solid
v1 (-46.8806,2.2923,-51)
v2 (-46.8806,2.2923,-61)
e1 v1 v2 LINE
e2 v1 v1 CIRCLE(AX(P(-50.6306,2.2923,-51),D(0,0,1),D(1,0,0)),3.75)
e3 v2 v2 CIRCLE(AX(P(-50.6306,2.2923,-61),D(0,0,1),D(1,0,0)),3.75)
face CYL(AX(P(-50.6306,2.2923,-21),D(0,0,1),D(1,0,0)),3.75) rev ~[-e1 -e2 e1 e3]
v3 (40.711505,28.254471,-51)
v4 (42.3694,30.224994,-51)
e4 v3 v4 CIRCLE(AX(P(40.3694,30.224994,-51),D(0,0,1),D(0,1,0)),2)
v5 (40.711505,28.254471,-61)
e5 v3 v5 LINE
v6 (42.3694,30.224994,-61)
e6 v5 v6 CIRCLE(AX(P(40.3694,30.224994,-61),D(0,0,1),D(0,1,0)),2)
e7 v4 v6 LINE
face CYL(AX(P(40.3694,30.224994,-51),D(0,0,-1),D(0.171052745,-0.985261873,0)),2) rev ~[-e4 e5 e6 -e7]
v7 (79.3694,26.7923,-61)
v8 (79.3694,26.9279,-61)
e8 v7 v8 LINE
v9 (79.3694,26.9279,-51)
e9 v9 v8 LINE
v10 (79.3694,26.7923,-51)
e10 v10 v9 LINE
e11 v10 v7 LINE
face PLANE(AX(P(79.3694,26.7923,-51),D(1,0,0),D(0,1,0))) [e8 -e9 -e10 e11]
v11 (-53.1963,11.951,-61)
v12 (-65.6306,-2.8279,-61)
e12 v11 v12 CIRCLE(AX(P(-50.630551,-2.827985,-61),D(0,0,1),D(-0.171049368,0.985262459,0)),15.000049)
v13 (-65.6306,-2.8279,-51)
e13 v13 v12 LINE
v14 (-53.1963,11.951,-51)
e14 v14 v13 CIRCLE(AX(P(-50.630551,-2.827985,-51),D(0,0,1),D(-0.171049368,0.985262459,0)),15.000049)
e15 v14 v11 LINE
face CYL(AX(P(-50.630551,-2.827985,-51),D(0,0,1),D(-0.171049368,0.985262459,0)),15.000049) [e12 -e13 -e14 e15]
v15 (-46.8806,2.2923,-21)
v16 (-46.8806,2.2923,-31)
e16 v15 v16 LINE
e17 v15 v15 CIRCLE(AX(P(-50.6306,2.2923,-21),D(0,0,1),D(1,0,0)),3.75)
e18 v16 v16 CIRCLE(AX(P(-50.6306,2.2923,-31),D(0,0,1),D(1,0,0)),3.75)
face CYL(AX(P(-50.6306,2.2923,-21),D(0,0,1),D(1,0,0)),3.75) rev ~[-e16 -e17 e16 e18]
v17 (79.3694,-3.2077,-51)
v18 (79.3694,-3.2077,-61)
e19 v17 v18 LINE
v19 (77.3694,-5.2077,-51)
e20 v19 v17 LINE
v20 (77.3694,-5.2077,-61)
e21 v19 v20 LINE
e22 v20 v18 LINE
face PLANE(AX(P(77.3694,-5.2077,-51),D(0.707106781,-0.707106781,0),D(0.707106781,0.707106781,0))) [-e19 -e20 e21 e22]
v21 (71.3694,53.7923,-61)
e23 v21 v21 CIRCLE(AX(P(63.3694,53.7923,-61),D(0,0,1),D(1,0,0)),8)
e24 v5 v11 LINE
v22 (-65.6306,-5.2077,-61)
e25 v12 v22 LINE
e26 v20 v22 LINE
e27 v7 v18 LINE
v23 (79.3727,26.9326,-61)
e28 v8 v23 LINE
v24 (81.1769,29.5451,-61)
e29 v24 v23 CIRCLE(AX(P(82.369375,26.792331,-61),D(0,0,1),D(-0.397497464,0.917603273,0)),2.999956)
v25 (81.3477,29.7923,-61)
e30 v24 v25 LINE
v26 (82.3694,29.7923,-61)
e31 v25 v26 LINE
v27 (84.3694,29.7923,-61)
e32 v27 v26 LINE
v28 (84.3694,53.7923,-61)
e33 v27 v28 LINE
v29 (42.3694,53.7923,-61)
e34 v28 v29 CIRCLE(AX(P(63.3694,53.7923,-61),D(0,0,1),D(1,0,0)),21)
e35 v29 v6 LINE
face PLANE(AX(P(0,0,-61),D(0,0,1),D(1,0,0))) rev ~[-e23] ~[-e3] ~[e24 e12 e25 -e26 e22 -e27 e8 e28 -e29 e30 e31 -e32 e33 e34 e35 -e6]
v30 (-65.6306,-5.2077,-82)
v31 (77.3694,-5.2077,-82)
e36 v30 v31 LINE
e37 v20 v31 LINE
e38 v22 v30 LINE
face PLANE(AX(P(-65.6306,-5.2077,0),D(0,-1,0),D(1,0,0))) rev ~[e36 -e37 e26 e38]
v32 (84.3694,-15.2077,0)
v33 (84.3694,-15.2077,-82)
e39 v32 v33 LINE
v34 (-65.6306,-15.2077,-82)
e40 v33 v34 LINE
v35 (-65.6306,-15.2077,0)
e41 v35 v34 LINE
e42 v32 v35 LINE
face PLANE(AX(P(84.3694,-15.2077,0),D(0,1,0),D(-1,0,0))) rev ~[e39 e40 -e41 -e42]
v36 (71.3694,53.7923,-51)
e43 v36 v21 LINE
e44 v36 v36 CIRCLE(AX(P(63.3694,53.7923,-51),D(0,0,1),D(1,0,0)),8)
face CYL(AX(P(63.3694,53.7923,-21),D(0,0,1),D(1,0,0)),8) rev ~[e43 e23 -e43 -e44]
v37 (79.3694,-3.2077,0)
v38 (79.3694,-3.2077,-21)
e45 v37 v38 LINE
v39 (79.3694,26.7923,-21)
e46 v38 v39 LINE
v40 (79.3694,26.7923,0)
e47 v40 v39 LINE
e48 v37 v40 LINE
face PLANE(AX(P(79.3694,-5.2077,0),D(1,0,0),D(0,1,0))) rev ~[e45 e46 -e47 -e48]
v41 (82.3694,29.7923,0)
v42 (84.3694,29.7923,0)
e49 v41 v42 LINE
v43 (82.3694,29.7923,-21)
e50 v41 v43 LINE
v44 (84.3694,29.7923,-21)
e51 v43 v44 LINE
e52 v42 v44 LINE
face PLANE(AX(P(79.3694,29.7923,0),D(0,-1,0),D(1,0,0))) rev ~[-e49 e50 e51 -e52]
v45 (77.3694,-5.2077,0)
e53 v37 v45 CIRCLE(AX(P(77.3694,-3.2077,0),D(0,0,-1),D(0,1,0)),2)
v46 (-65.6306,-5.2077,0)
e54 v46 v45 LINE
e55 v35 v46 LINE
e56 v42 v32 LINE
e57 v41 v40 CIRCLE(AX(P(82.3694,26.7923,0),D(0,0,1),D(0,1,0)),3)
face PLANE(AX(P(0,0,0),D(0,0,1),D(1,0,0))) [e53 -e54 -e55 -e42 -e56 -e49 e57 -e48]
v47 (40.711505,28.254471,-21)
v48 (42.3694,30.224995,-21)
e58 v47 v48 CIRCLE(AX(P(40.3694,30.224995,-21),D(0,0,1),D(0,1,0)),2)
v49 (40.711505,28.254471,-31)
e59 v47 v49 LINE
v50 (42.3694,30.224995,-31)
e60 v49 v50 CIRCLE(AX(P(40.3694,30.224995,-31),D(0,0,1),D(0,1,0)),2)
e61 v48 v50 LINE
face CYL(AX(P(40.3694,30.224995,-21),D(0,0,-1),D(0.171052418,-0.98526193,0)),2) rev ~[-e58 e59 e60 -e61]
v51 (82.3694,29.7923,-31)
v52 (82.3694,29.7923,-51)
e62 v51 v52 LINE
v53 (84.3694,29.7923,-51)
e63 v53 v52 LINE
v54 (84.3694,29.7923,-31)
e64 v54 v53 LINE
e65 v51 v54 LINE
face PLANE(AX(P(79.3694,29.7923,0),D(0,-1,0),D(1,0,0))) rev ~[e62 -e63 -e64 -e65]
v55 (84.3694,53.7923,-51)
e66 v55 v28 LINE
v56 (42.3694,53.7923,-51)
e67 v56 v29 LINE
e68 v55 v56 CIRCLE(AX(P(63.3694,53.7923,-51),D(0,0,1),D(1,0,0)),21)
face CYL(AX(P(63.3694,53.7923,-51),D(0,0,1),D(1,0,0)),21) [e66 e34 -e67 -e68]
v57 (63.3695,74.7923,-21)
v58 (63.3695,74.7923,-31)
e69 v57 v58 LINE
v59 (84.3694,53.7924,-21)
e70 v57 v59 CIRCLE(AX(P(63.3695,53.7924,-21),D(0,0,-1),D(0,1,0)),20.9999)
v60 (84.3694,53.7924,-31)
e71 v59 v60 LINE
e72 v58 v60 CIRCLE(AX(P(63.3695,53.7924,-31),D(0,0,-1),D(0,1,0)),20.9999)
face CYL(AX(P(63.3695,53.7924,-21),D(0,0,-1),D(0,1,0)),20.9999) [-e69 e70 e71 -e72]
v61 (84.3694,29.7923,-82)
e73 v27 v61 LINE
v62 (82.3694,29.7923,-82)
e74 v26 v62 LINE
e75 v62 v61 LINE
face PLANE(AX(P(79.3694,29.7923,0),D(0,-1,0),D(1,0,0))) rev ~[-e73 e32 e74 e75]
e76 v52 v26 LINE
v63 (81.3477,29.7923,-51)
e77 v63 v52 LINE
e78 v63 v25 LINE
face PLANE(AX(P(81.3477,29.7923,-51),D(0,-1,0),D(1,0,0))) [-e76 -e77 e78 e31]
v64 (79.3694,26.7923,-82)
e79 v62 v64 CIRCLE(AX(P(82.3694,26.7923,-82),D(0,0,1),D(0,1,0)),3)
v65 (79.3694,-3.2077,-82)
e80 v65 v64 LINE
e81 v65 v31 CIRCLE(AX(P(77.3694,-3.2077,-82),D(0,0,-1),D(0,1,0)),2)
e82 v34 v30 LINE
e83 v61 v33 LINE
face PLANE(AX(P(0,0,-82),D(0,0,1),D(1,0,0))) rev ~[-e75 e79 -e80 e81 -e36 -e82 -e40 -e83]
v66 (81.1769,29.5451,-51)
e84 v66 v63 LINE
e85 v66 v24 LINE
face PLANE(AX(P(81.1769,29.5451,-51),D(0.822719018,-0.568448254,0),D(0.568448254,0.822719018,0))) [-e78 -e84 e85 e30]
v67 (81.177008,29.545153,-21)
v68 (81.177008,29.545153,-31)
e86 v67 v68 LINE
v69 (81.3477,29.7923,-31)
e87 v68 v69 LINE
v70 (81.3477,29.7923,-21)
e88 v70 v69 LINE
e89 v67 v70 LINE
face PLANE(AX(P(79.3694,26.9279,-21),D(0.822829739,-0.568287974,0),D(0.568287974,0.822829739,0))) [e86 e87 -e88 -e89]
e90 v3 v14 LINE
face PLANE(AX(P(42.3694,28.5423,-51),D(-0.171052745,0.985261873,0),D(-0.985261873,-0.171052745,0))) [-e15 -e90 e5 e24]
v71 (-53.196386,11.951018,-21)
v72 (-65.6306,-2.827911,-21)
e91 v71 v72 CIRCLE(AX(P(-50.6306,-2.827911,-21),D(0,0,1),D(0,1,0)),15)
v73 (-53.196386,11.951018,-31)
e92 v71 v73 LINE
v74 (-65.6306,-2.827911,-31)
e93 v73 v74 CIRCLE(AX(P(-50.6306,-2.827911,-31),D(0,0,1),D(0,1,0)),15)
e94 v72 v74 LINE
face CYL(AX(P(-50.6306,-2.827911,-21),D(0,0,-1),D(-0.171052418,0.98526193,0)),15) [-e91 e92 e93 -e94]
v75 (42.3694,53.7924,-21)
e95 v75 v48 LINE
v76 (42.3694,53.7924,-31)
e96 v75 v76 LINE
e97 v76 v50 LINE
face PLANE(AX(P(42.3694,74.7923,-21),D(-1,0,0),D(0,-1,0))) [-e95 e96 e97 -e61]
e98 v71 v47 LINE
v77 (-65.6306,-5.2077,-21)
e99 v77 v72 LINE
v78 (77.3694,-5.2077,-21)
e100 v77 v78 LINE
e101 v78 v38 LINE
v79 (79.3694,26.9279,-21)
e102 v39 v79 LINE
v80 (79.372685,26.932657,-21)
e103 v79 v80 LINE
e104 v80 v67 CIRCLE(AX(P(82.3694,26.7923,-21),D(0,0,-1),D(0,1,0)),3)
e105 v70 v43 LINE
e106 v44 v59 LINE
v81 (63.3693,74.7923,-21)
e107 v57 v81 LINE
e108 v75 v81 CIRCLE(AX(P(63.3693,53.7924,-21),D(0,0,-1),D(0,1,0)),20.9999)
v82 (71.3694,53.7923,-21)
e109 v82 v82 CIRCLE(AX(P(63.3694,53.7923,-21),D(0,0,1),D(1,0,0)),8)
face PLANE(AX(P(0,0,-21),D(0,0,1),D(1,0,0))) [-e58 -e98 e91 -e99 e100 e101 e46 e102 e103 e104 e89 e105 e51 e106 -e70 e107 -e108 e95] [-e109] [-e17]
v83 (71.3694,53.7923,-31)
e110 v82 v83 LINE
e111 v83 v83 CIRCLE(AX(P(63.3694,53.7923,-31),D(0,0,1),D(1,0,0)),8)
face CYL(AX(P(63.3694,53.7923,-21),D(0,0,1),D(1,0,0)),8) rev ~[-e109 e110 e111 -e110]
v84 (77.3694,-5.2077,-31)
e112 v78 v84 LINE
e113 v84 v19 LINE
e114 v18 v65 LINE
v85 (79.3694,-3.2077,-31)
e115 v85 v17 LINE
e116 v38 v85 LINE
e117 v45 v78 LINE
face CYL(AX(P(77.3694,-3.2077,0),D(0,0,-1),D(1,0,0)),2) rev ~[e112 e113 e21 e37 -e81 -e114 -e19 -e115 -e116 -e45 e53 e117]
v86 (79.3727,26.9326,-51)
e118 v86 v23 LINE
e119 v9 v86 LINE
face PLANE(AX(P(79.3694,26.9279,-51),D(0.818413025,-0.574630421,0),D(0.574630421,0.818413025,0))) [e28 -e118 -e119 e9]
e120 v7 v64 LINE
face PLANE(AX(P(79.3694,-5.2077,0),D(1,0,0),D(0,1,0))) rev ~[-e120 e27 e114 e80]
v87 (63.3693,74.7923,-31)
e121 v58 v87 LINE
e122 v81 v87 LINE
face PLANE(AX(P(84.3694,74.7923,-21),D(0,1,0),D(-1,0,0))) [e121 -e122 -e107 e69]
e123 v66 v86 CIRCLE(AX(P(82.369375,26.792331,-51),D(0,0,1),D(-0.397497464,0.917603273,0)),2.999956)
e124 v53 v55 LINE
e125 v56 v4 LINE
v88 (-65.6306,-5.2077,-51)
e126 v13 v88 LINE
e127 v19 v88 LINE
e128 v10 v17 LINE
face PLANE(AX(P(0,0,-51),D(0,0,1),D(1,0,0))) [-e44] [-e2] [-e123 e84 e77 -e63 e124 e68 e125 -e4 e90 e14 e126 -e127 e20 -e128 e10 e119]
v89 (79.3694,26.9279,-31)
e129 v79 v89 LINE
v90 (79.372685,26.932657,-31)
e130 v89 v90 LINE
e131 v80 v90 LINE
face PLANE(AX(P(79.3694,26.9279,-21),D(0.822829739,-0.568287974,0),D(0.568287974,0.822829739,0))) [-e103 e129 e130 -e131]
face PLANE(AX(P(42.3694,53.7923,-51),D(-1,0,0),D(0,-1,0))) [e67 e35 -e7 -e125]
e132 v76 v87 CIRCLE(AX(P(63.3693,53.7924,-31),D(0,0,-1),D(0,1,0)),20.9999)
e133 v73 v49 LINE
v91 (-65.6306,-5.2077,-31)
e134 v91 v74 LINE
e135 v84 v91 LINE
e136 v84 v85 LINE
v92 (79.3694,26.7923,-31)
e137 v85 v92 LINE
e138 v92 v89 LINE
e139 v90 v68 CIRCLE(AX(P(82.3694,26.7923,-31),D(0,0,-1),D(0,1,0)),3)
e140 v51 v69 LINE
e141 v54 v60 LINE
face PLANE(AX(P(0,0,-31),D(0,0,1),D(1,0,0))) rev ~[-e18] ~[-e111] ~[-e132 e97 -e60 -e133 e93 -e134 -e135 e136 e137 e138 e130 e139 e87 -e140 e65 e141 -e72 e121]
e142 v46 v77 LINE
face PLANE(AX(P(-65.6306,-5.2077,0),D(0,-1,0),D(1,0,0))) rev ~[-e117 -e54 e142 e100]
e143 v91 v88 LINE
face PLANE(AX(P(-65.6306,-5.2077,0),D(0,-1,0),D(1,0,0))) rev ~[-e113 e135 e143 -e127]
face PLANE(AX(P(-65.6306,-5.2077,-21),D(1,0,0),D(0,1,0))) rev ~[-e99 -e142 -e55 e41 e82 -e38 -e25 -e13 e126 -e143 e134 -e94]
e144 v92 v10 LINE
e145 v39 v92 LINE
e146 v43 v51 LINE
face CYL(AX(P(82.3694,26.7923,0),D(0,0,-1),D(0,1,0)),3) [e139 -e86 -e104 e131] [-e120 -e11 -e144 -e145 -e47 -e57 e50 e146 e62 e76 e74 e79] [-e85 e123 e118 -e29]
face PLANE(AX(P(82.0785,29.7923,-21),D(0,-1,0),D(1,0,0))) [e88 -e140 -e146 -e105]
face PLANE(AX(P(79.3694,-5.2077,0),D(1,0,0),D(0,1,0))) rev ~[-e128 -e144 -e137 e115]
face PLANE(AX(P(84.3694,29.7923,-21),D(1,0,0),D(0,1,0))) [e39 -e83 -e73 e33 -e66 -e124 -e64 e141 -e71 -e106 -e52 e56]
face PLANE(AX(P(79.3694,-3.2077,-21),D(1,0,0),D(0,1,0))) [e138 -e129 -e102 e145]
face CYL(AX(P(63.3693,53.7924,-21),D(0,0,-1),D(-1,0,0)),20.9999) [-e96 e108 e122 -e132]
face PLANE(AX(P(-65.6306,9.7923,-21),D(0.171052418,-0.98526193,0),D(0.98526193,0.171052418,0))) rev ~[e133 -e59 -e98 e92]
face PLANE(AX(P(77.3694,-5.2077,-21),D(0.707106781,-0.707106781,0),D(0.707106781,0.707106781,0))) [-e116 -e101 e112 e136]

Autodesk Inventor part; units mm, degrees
ref_plane "YZ Plane" through (0, 0, 0) normal (1, 0, 0) x (0, 1, 0)
ref_plane "XZ Plane" through (0, 0, 0) normal (0, 1, 0) x (-1, 0, 0)
sketch "Sketch1" plane through (0, 0, 0) normal (0, 0, 1) x (1, 0, 0)
  line L0 (79.3694, 29.7923) -> (84.3694, 29.7923)
  line L1 (84.3694, 29.7923) -> (84.3694, -15.2077)
  line L2 (84.3694, -15.2077) -> (-65.6306, -15.2077)
  line L3 (-65.6306, -15.2077) -> (-65.6306, -5.2077)
  line L4 (-65.6306, -5.2077) -> (79.3694, -5.2077)
  line L5 (79.3694, -5.2077) -> (79.3694, 29.7923)
  line L6 (79.3694, 29.7923) -> (84.3694, 29.7923)
  point P0 (0, 0)
  dimension "d0" = 45
  dimension "d1" = 150
  dimension "d2" = 10
  dimension "d3" = 5
extrude "Extrusion1" add sketch "Sketch1" against normal blind 82
fillet "Fillet1" radius 3 1 edges at (79.3694, 29.7923, -41)
fillet "Fillet2" radius 2 1 edges at (79.3694, -5.2077, -41)
ref_plane "Work Plane1" through (0, 0, -21) normal (0, 0, 1) x (1, 0, 0)
sketch "Sketch2" plane through (0, 0, -21) normal (0, 0, 1) x (1, 0, 0)
  point P0 (0, 0)
sketch "Sketch3" plane through (0, 0, -21) normal (0, 0, 1) x (1, 0, 0)
  line L0 (-65.6306, -15.2077) -> (-65.6306, -5.2077) projected
  line L1 (-65.6306, -5.2077) -> (-65.6306, 9.7923)
  line L2 (-65.6306, 9.7923) -> (42.3694, 28.5423)
  line L3 (-65.6306, -5.2077) -> (77.3694, -5.2077) projected
  line L4 (54.3694, -5.2077) -> (84.3564, -5.2077)
  arc A0 (77.3694, -5.2077) -> (79.3694, -3.2077) centre (77.3694, -3.2077) ccw projected
  line L5 (77.3694, -5.2077) -> (79.3694, -3.2077)
  line L6 (79.3694, -3.2077) -> (79.3694, 26.9279)
  line L7 (79.3694, 26.9279) -> (81.3477, 29.7923)
  line L8 (81.3477, 29.7923) -> (82.0785, 29.7923)
  line L9 (82.3694, 29.7923) -> (84.3694, 29.7923) projected
  line L10 (82.0785, 29.7923) -> (84.3694, 29.7923)
  line L11 (84.3694, 29.7923) -> (84.3694, 74.7923)
  line L12 (84.3694, 74.7923) -> (42.3694, 74.7923)
  line L13 (42.3694, 74.7923) -> (42.3694, 28.5423)
  point P0 (0, 0)
  point P1 (77.3694, -5.2077)
  dimension "d9" = 15
  dimension "d12" = 108
  dimension "d13" = 25
  dimension "d21" = 45
  dimension "d23" = 42
extrude "Extrusion2" add sketch "Sketch3" against normal blind 10 contours L1 L2 L13 L12 L11 L9 L10 L8 L7 L6 L5 L3
fillet "Fillet4" radius 21 2 edges at (84.3694, 74.7923, -26) (42.3694, 74.7923, -26)
fillet "Fillet5" radius 15 1 edges at (-65.6306, 9.7923, -26)
sketch "Sketch4" plane through (0, 0, -21) normal (0, 0, 1) x (1, 0, 0)
  point P0 (0, 0)
ref_plane "Work Plane3" through (0, 0, -51) normal (0, 0, 1) x (1, 0, 0)
sketch "Sketch6" plane through (0, 0, -51) normal (0, 0, 1) x (1, 0, 0)
  line L0 (77.3694, -5.2077) -> (-65.6306, -5.2077) projected
  arc A0 (-53.1963, 11.951) -> (-65.6306, -2.8279) centre (-50.6306, -2.8279) ccw projected
  line L1 (-65.6306, -2.8279) -> (-65.6306, -5.2077) projected
  line L2 (77.3694, -5.2077) -> (-65.6306, -5.2077) projected
  line L3 (77.3694, -5.2077) -> (79.3694, -3.2077) projected
  line L4 (79.3694, 26.7923) -> (79.3694, -3.2077) projected
  line L5 (79.3694, 26.7923) -> (79.3694, 26.9279) projected
  line L6 (79.3694, 26.9279) -> (79.3727, 26.9326) projected
  arc A1 (81.1769, 29.5451) -> (79.3727, 26.9326) centre (82.3694, 26.7923) ccw projected
  line L7 (81.1769, 29.5451) -> (81.3477, 29.7923) projected
  line L8 (81.3477, 29.7923) -> (82.3694, 29.7923) projected
  line L9 (84.3694, 29.7923) -> (82.3694, 29.7923) projected
  line L10 (84.3694, 29.7923) -> (84.3694, 53.7923) projected
  arc A2 (84.3694, 53.7923) -> (42.3694, 53.7923) centre (63.3694, 53.7923) ccw projected
  line L11 (42.3694, 53.7923) -> (42.3694, 28.5423) projected
  line L12 (42.3694, 28.5423) -> (-53.1963, 11.951) projected
  point P0 (0, 0)
extrude "Extrusion3" add sketch "Sketch6" against normal blind 10
sketch "Sketch7" plane through (0, 0, -21) normal (0, 0, 1) x (1, 0, 0)
  line L0 (-65.6306, -5.2077) -> (77.3694, -5.2077) projected
  line L1 (-65.6306, -5.2077) -> (77.3694, -5.2077) projected
  line L2 (-53.1963, 11.951) -> (42.3694, 28.5423) projected
  arc A0 (-53.1963, 11.951) -> (-65.6306, -2.8279) centre (-50.6306, -2.8279) ccw projected
  circle A1 centre (-50.6306, 2.2923) radius 3.75
  line L3 (42.3694, 53.7923) -> (42.3694, 28.5423) projected
  arc A2 (84.3694, 53.7923) -> (42.3694, 53.7923) centre (63.3694, 53.7923) ccw projected
  circle A3 centre (63.3694, 53.7923) radius 8
  point P0 (0, 0)
  point P1 (-50.6306, -5.2077)
  dimension "d29" = 15
  dimension "d30" = 7.5
  dimension "d31" = 7.5
  dimension "d34" = 16
extrude "Extrusion4" cut sketch "Sketch7" against normal blind 40 contours A1
sketch "Sketch8" plane through (0, 0, -21) normal (0, 0, 1) x (1, 0, 0)
  arc A0 (84.3694, 53.7923) -> (42.3694, 53.7923) centre (63.3694, 53.7923) ccw projected
  circle A1 centre (63.3694, 53.7923) radius 8
  point P0 (0, 0)
  dimension "d35" = 16
extrude "Extrusion5" cut sketch "Sketch8" against normal blind 40
fillet "Fillet6" radius 2 2 edges at (42.3694, 28.5423, -26) (42.3694, 28.5423, -56)
